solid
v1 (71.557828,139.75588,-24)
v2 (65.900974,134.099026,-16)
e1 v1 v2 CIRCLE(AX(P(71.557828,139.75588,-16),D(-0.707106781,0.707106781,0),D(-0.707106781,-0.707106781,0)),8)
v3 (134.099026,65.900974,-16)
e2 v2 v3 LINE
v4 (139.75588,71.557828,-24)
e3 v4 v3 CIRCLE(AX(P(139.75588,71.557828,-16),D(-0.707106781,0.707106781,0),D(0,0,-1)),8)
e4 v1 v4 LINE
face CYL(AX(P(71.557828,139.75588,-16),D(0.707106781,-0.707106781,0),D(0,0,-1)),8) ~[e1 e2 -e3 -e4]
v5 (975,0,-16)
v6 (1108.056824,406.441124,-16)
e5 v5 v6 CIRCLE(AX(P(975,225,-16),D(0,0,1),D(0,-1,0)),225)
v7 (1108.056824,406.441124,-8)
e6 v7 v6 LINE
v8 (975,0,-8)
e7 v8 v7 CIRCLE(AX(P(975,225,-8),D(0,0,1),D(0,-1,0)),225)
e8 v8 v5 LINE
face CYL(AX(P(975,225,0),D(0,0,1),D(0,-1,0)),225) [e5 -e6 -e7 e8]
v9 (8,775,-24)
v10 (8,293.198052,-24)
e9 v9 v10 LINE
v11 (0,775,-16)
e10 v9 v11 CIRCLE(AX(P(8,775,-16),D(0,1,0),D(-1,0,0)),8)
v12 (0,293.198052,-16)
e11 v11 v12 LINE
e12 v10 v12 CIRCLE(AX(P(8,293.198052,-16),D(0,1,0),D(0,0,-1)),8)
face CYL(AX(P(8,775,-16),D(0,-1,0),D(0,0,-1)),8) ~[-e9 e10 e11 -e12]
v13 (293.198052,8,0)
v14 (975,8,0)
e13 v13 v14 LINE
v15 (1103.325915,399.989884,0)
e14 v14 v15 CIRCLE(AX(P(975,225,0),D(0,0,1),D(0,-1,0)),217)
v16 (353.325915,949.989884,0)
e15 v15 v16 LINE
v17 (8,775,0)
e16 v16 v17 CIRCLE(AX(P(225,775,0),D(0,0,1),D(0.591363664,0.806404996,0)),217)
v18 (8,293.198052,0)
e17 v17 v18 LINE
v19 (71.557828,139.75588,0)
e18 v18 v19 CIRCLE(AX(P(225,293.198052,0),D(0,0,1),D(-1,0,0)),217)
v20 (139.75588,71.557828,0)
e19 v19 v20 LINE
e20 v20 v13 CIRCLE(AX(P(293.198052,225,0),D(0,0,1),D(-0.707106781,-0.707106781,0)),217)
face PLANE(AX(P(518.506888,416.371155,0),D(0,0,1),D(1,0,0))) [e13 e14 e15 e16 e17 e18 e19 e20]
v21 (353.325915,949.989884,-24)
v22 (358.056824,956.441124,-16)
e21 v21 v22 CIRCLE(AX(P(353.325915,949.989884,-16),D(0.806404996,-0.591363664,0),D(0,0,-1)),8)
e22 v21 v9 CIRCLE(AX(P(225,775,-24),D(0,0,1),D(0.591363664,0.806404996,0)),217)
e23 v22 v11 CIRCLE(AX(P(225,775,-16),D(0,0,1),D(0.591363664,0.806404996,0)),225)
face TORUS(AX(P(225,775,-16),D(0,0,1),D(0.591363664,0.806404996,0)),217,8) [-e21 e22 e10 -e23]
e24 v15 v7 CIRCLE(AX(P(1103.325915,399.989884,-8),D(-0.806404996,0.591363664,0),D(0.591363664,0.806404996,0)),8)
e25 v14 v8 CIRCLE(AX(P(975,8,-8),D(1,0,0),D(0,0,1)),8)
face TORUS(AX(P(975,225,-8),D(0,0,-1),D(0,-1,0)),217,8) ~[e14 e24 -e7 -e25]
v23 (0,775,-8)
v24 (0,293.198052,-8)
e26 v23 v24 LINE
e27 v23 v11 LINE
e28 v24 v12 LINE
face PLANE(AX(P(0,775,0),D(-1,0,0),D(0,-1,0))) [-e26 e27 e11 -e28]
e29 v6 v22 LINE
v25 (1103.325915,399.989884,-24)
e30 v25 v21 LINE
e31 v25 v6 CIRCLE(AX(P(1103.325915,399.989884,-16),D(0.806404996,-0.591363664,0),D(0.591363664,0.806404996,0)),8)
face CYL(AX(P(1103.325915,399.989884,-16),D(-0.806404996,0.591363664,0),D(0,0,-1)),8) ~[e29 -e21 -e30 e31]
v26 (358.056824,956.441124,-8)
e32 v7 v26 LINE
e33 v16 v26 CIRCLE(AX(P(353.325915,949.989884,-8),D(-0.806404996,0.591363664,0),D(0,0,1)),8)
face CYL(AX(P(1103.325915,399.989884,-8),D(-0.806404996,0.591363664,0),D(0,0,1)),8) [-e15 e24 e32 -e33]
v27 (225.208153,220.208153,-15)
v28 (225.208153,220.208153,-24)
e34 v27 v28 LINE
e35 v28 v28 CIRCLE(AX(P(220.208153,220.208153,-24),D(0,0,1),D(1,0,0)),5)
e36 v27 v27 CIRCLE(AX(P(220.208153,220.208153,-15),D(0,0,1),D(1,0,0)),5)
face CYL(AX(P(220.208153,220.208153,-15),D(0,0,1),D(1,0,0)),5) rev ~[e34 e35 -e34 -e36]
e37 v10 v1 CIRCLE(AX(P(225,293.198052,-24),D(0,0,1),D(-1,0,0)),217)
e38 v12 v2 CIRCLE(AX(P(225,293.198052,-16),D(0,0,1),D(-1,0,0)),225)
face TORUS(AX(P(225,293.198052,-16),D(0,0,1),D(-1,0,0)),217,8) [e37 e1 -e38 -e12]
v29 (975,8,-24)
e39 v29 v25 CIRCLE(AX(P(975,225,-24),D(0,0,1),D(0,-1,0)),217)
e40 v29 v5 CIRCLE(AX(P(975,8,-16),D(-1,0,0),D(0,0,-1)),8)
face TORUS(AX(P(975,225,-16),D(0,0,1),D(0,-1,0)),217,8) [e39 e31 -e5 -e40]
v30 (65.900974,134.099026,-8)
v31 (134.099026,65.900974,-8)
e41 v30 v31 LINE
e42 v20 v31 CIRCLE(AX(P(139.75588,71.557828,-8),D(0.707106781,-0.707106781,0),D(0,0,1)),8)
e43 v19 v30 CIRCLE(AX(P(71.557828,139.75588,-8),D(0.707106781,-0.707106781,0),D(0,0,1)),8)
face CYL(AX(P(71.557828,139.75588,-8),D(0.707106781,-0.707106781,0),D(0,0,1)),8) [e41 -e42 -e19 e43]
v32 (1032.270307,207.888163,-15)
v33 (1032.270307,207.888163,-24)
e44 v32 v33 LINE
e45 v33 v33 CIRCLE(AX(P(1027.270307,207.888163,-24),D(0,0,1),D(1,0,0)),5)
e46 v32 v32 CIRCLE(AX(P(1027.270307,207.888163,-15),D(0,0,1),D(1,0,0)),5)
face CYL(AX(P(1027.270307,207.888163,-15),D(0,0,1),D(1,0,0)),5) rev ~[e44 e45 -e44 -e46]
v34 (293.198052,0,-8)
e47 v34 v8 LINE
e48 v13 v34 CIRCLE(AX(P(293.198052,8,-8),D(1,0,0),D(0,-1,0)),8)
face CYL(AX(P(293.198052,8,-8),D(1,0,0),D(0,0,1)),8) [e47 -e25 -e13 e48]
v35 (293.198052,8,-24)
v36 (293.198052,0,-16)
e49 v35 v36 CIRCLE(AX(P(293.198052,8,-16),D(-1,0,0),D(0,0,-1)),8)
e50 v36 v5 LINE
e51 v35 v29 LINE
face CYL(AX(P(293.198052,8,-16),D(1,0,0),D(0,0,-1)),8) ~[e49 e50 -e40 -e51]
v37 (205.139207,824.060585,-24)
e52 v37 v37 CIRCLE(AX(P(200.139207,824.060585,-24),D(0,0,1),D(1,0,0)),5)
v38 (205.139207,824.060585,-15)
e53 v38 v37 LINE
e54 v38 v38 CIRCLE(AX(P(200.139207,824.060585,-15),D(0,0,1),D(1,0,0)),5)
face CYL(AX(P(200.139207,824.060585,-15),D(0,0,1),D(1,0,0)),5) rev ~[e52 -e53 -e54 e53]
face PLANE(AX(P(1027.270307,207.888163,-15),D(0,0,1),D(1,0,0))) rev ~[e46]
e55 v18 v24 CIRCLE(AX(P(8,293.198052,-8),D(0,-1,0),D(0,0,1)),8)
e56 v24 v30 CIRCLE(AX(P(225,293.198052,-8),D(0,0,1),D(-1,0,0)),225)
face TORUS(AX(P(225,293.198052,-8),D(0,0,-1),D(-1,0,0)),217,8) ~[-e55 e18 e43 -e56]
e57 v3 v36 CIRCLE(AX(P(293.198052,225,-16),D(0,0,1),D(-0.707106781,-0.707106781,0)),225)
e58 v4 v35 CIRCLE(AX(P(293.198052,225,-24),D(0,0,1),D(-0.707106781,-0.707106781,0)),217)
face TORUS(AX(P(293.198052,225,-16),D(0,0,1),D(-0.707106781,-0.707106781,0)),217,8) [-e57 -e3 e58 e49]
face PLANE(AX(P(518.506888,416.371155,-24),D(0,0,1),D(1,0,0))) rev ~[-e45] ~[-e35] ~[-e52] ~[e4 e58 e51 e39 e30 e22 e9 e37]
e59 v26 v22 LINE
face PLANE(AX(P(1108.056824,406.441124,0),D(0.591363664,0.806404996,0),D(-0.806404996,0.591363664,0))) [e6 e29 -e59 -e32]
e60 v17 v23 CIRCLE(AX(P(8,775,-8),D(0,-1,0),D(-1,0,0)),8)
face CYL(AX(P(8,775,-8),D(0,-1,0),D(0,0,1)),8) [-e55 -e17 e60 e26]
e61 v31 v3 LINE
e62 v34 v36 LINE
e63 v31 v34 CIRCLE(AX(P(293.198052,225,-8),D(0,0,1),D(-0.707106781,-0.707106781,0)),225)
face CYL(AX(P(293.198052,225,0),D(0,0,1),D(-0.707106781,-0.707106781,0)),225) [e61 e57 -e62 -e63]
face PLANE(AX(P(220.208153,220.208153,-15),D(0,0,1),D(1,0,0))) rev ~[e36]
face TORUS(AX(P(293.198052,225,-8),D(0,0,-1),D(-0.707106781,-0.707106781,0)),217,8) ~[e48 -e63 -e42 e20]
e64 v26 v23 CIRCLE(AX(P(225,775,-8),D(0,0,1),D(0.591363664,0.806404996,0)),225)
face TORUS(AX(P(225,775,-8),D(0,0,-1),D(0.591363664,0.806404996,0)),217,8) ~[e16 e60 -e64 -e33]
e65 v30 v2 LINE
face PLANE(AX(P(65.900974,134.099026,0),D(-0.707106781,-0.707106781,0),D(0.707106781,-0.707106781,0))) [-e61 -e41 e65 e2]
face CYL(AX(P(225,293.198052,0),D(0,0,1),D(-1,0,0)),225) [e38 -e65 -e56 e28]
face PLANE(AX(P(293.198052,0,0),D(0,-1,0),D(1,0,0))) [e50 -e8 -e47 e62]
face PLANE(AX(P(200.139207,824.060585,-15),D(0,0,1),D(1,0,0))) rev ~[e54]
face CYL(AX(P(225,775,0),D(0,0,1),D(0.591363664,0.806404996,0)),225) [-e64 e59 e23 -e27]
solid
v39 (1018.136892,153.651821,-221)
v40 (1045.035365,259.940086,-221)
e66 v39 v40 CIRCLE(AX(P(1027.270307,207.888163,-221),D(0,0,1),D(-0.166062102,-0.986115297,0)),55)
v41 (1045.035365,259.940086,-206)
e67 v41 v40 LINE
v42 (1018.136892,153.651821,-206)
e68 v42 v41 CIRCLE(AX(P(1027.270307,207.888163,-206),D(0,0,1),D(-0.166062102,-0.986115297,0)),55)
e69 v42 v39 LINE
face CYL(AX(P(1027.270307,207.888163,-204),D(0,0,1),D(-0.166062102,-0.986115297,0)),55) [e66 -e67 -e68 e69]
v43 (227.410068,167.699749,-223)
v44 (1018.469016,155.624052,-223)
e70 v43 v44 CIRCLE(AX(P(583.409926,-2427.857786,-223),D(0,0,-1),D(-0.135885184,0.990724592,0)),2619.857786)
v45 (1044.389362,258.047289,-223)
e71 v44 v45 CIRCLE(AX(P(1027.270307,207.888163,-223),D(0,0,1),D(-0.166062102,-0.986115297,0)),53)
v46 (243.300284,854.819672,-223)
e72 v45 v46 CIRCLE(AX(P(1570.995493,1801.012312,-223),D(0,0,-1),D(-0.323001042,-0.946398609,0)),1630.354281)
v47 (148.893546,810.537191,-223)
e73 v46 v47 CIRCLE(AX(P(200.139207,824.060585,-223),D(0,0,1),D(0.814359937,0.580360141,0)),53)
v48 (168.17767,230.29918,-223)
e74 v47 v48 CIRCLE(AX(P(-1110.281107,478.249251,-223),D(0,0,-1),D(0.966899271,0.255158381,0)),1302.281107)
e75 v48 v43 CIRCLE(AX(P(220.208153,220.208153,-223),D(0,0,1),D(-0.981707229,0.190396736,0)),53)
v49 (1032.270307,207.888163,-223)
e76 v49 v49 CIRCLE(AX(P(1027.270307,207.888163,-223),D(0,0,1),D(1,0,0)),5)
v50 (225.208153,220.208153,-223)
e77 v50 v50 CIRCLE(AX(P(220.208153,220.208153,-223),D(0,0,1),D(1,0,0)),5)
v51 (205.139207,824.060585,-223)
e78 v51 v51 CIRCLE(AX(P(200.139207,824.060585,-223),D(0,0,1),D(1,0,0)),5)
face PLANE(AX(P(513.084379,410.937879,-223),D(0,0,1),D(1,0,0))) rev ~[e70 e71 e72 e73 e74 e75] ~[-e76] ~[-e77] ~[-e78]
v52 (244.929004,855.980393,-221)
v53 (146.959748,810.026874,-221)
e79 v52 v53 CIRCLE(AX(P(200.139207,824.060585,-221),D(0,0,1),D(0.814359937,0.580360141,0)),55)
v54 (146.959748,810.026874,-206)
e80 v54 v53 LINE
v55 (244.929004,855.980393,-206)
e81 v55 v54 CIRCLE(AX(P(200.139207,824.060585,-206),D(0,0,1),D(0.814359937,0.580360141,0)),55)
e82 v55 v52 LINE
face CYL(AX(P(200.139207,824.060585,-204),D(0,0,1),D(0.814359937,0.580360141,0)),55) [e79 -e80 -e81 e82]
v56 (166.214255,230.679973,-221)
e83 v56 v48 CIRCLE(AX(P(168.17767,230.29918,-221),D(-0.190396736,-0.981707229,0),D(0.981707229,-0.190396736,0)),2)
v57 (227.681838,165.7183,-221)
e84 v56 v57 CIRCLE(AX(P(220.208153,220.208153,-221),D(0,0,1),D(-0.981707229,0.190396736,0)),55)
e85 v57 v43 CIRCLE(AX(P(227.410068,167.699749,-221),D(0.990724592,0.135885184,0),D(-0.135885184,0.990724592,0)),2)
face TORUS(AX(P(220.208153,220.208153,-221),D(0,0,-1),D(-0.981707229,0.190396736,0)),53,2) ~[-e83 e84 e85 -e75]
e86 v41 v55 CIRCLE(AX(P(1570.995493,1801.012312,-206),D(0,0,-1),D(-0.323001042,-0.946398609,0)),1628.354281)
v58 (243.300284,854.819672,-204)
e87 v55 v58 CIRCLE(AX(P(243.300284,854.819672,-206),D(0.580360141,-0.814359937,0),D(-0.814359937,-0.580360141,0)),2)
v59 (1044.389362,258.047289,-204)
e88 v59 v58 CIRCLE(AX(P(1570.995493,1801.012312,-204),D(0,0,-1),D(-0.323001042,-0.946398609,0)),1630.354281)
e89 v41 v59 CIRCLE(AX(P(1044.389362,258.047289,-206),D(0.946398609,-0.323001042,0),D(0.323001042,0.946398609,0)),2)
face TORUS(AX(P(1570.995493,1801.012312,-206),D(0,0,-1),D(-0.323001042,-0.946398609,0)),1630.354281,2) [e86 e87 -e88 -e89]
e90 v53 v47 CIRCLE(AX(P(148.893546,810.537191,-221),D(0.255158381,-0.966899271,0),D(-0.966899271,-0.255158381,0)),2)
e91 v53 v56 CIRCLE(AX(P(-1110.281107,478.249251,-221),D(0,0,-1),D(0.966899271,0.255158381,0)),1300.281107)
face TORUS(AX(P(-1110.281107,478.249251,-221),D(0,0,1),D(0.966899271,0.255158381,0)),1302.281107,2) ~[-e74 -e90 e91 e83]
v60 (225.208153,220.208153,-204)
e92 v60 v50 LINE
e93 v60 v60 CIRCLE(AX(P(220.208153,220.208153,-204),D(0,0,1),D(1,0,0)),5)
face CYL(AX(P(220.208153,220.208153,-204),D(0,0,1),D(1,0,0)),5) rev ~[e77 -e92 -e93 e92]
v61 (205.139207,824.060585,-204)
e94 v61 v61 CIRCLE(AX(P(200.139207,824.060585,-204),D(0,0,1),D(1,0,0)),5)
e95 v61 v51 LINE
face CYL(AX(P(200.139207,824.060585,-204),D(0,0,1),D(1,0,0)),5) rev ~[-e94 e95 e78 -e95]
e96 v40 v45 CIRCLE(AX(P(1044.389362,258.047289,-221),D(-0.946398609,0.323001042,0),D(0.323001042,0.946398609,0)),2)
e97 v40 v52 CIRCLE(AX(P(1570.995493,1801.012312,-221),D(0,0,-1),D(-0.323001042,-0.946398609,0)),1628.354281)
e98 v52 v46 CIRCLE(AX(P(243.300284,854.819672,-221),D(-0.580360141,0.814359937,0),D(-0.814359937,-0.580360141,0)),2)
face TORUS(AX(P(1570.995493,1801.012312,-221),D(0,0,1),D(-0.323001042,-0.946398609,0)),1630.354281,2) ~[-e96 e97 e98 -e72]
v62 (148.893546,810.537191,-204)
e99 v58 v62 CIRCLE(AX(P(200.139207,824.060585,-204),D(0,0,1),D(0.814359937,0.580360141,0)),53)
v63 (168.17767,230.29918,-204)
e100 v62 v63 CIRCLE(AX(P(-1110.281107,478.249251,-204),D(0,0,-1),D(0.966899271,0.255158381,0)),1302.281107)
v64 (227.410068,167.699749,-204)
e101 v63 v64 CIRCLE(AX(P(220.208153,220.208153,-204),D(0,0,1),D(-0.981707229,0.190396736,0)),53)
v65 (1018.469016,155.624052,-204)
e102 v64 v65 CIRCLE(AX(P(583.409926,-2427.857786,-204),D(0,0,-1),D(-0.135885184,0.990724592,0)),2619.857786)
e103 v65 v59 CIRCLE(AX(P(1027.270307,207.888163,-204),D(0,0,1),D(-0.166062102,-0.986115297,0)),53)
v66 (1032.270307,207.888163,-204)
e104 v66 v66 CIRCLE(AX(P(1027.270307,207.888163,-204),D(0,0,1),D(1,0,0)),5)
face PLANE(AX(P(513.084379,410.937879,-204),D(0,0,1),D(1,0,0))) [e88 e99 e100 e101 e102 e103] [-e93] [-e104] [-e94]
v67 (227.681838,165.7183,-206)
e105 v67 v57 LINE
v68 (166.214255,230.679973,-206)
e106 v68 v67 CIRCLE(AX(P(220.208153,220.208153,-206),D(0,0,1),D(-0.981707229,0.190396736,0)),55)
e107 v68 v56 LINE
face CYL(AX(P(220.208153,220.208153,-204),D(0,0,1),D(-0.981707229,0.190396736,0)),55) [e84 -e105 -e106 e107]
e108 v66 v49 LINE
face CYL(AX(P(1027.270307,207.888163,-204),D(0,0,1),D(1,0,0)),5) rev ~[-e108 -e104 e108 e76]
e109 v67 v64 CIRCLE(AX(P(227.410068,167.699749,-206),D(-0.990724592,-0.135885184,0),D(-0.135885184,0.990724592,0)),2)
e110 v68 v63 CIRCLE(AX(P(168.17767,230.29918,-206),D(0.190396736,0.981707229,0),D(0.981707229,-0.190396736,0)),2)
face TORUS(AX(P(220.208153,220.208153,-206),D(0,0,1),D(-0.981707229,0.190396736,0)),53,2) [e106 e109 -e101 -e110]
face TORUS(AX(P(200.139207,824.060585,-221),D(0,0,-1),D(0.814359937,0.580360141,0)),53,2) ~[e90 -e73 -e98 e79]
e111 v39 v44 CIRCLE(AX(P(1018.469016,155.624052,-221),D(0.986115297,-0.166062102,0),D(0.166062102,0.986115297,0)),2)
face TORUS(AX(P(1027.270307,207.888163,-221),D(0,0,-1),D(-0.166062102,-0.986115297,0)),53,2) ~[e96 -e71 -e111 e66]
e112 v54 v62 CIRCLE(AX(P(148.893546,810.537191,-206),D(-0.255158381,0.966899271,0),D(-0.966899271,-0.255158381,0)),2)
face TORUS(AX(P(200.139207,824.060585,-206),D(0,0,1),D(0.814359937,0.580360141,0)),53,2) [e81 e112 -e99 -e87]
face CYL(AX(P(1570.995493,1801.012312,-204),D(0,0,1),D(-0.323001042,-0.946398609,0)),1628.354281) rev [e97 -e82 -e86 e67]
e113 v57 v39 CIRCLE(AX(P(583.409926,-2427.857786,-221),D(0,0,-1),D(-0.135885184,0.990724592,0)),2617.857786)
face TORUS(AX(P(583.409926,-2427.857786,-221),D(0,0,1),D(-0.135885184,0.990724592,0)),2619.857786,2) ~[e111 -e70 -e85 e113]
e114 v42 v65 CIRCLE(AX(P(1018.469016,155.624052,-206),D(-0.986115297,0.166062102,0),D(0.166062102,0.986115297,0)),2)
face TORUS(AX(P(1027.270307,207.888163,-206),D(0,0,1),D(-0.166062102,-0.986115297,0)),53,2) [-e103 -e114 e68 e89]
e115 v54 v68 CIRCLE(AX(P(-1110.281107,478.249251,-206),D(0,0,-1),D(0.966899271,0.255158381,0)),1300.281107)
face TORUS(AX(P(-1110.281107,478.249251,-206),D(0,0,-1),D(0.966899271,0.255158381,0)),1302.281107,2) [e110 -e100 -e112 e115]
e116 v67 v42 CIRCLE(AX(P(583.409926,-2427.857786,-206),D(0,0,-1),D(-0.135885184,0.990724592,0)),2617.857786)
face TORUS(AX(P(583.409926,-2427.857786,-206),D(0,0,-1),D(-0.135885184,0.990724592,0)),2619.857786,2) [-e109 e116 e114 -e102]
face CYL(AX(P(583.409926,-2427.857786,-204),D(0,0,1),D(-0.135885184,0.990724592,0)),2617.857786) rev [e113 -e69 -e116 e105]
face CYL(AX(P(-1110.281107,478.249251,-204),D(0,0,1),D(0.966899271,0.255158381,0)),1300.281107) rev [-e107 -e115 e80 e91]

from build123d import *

# Parameters (mm, degrees)
F0_R     = 5
F1_DEPTH = 24
F2_START = -15
F2_DEPTH = 9.001
F3_R     = 8
F4_START = -204
F4_DEPTH = 19
F5_R     = 2


# Not quite as in the source:
# - a feature names something its author has since deleted; it is built from what else it names


with BuildPart() as f1:
    # F0 (on Top) → F1 (new body)
    with BuildSketch(Plane.XY):
        with BuildLine():
            ThreePointArc((358.0568243162, 956.4411240675), (123.2964736873, 975.7022489549), (0, 775))
            Line((0, 775), (0, 293.1980515339))
            ThreePointArc((0, 293.1980515339), (17.127105185, 207.0942792518), (65.900974233, 134.099025767))
            Line((65.900974233, 134.099025767), (134.099025767, 65.900974233))
            ThreePointArc((134.099025767, 65.900974233), (207.0942792518, 17.127105185), (293.1980515339, 0))
            Line((293.1980515339, 0), (975, 0))
            ThreePointArc((975, 0), (1188.8331743617, 154.9973318908), (1108.0568243162, 406.4411240675))
            Line((1108.0568243162, 406.4411240675), (358.0568243162, 956.4411240675))
        make_face()
        with BuildLine():
            ThreePointArc((146.9597475721, 810.0268739765), (176.7826648554, 873.8548809714), (244.9290040162, 855.9803926927))
            ThreePointArc((244.9290040162, 855.9803926927), (598.2074073313, 495.1712029306), (1045.0353645703, 259.9400861638))
            ThreePointArc((1045.0353645703, 259.9400861638), (1080.5893950333, 194.3946501102), (1018.1368916862, 153.651821351))
            ThreePointArc((1018.1368916862, 153.651821351), (623.3674740325, 189.6950371654), (227.6818379424, 165.7183002563))
            ThreePointArc((227.6818379424, 165.7183002563), (180.2577174949, 182.4065295721), (166.2142552173, 230.6799732568))
            ThreePointArc((166.2142552173, 230.6799732568), (189.282478165, 521.4400528998), (146.9597475721, 810.0268739765))
        make_face(mode=Mode.SUBTRACT)
        with BuildLine():
            ThreePointArc((1045.0353645703, 259.9400861638), (598.2074073313, 495.1712029306), (244.9290040162, 855.9803926927))
            ThreePointArc((244.9290040162, 855.9803926927), (176.7826648554, 873.8548809714), (146.9597475721, 810.0268739765))
            ThreePointArc((146.9597475721, 810.0268739765), (189.282478165, 521.4400528998), (166.2142552173, 230.6799732568))
            ThreePointArc((166.2142552173, 230.6799732568), (180.2577174949, 182.4065295721), (227.6818379424, 165.7183002563))
            ThreePointArc((227.6818379424, 165.7183002563), (623.3674740325, 189.6950371654), (1018.1368916862, 153.651821351))
            ThreePointArc((1018.1368916862, 153.651821351), (1080.5893950333, 194.3946501102), (1045.0353645703, 259.9400861638))
        make_face()
        with Locations((220.2081528017, 220.2081528017)):
            Circle(F0_R, mode=Mode.SUBTRACT)
        with Locations((1027.2703072802, 207.8881626692)):
            Circle(F0_R, mode=Mode.SUBTRACT)
        with Locations((200.1392074826, 824.0605849477)):
            Circle(F0_R, mode=Mode.SUBTRACT)
        with Locations((220.2081528017, 220.2081528017)):
            Circle(F0_R)
        with Locations((200.1392074826, 824.0605849477)):
            Circle(F0_R)
        with Locations((1027.2703072802, 207.8881626692)):
            Circle(F0_R)
    extrude(amount=-F1_DEPTH)

    # F0 (on Top) → F2 (cut)
    with BuildSketch(Plane.XY.offset(F2_START)):
        with Locations((1027.2703072802, 207.8881626692)):
            Circle(F0_R)
        with Locations((220.2081528017, 220.2081528017)):
            Circle(F0_R)
        with Locations((200.1392074826, 824.0605849477)):
            Circle(F0_R)
    extrude(amount=-F2_DEPTH, mode=Mode.SUBTRACT)

    # F3
    f3_edges = [f1.edges().sort_by_distance(p)[0] for p in [
        (100, 100, 0),
        (634.099026, 0, -24),
    ]]
    fillet(f3_edges, radius=F3_R)


with BuildPart() as f4:
    # F0 (on Top) → F4 (new body)
    with BuildSketch(Plane.XY.offset(F4_START)):
        with BuildLine():
            ThreePointArc((1045.0353645703, 259.9400861638), (598.2074073313, 495.1712029306), (244.9290040162, 855.9803926927))
            ThreePointArc((244.9290040162, 855.9803926927), (176.7826648554, 873.8548809714), (146.9597475721, 810.0268739765))
            ThreePointArc((146.9597475721, 810.0268739765), (189.282478165, 521.4400528998), (166.2142552173, 230.6799732568))
            ThreePointArc((166.2142552173, 230.6799732568), (180.2577174949, 182.4065295721), (227.6818379424, 165.7183002563))
            ThreePointArc((227.6818379424, 165.7183002563), (623.3674740325, 189.6950371654), (1018.1368916862, 153.651821351))
            ThreePointArc((1018.1368916862, 153.651821351), (1080.5893950333, 194.3946501102), (1045.0353645703, 259.9400861638))
        make_face()
        with Locations((220.2081528017, 220.2081528017)):
            Circle(F0_R, mode=Mode.SUBTRACT)
        with Locations((1027.2703072802, 207.8881626692)):
            Circle(F0_R, mode=Mode.SUBTRACT)
        with Locations((200.1392074826, 824.0605849477)):
            Circle(F0_R, mode=Mode.SUBTRACT)
    extrude(amount=-F4_DEPTH)

    # F5
    f5_edges = [f4.edges().sort_by_distance(p)[0] for p in [
        (623.367474, 189.695037, -204),
        (623.367474, 189.695037, -223),
    ]]
    fillet(f5_edges, radius=F5_R)


solid = Compound([f1.part, f4.part])
